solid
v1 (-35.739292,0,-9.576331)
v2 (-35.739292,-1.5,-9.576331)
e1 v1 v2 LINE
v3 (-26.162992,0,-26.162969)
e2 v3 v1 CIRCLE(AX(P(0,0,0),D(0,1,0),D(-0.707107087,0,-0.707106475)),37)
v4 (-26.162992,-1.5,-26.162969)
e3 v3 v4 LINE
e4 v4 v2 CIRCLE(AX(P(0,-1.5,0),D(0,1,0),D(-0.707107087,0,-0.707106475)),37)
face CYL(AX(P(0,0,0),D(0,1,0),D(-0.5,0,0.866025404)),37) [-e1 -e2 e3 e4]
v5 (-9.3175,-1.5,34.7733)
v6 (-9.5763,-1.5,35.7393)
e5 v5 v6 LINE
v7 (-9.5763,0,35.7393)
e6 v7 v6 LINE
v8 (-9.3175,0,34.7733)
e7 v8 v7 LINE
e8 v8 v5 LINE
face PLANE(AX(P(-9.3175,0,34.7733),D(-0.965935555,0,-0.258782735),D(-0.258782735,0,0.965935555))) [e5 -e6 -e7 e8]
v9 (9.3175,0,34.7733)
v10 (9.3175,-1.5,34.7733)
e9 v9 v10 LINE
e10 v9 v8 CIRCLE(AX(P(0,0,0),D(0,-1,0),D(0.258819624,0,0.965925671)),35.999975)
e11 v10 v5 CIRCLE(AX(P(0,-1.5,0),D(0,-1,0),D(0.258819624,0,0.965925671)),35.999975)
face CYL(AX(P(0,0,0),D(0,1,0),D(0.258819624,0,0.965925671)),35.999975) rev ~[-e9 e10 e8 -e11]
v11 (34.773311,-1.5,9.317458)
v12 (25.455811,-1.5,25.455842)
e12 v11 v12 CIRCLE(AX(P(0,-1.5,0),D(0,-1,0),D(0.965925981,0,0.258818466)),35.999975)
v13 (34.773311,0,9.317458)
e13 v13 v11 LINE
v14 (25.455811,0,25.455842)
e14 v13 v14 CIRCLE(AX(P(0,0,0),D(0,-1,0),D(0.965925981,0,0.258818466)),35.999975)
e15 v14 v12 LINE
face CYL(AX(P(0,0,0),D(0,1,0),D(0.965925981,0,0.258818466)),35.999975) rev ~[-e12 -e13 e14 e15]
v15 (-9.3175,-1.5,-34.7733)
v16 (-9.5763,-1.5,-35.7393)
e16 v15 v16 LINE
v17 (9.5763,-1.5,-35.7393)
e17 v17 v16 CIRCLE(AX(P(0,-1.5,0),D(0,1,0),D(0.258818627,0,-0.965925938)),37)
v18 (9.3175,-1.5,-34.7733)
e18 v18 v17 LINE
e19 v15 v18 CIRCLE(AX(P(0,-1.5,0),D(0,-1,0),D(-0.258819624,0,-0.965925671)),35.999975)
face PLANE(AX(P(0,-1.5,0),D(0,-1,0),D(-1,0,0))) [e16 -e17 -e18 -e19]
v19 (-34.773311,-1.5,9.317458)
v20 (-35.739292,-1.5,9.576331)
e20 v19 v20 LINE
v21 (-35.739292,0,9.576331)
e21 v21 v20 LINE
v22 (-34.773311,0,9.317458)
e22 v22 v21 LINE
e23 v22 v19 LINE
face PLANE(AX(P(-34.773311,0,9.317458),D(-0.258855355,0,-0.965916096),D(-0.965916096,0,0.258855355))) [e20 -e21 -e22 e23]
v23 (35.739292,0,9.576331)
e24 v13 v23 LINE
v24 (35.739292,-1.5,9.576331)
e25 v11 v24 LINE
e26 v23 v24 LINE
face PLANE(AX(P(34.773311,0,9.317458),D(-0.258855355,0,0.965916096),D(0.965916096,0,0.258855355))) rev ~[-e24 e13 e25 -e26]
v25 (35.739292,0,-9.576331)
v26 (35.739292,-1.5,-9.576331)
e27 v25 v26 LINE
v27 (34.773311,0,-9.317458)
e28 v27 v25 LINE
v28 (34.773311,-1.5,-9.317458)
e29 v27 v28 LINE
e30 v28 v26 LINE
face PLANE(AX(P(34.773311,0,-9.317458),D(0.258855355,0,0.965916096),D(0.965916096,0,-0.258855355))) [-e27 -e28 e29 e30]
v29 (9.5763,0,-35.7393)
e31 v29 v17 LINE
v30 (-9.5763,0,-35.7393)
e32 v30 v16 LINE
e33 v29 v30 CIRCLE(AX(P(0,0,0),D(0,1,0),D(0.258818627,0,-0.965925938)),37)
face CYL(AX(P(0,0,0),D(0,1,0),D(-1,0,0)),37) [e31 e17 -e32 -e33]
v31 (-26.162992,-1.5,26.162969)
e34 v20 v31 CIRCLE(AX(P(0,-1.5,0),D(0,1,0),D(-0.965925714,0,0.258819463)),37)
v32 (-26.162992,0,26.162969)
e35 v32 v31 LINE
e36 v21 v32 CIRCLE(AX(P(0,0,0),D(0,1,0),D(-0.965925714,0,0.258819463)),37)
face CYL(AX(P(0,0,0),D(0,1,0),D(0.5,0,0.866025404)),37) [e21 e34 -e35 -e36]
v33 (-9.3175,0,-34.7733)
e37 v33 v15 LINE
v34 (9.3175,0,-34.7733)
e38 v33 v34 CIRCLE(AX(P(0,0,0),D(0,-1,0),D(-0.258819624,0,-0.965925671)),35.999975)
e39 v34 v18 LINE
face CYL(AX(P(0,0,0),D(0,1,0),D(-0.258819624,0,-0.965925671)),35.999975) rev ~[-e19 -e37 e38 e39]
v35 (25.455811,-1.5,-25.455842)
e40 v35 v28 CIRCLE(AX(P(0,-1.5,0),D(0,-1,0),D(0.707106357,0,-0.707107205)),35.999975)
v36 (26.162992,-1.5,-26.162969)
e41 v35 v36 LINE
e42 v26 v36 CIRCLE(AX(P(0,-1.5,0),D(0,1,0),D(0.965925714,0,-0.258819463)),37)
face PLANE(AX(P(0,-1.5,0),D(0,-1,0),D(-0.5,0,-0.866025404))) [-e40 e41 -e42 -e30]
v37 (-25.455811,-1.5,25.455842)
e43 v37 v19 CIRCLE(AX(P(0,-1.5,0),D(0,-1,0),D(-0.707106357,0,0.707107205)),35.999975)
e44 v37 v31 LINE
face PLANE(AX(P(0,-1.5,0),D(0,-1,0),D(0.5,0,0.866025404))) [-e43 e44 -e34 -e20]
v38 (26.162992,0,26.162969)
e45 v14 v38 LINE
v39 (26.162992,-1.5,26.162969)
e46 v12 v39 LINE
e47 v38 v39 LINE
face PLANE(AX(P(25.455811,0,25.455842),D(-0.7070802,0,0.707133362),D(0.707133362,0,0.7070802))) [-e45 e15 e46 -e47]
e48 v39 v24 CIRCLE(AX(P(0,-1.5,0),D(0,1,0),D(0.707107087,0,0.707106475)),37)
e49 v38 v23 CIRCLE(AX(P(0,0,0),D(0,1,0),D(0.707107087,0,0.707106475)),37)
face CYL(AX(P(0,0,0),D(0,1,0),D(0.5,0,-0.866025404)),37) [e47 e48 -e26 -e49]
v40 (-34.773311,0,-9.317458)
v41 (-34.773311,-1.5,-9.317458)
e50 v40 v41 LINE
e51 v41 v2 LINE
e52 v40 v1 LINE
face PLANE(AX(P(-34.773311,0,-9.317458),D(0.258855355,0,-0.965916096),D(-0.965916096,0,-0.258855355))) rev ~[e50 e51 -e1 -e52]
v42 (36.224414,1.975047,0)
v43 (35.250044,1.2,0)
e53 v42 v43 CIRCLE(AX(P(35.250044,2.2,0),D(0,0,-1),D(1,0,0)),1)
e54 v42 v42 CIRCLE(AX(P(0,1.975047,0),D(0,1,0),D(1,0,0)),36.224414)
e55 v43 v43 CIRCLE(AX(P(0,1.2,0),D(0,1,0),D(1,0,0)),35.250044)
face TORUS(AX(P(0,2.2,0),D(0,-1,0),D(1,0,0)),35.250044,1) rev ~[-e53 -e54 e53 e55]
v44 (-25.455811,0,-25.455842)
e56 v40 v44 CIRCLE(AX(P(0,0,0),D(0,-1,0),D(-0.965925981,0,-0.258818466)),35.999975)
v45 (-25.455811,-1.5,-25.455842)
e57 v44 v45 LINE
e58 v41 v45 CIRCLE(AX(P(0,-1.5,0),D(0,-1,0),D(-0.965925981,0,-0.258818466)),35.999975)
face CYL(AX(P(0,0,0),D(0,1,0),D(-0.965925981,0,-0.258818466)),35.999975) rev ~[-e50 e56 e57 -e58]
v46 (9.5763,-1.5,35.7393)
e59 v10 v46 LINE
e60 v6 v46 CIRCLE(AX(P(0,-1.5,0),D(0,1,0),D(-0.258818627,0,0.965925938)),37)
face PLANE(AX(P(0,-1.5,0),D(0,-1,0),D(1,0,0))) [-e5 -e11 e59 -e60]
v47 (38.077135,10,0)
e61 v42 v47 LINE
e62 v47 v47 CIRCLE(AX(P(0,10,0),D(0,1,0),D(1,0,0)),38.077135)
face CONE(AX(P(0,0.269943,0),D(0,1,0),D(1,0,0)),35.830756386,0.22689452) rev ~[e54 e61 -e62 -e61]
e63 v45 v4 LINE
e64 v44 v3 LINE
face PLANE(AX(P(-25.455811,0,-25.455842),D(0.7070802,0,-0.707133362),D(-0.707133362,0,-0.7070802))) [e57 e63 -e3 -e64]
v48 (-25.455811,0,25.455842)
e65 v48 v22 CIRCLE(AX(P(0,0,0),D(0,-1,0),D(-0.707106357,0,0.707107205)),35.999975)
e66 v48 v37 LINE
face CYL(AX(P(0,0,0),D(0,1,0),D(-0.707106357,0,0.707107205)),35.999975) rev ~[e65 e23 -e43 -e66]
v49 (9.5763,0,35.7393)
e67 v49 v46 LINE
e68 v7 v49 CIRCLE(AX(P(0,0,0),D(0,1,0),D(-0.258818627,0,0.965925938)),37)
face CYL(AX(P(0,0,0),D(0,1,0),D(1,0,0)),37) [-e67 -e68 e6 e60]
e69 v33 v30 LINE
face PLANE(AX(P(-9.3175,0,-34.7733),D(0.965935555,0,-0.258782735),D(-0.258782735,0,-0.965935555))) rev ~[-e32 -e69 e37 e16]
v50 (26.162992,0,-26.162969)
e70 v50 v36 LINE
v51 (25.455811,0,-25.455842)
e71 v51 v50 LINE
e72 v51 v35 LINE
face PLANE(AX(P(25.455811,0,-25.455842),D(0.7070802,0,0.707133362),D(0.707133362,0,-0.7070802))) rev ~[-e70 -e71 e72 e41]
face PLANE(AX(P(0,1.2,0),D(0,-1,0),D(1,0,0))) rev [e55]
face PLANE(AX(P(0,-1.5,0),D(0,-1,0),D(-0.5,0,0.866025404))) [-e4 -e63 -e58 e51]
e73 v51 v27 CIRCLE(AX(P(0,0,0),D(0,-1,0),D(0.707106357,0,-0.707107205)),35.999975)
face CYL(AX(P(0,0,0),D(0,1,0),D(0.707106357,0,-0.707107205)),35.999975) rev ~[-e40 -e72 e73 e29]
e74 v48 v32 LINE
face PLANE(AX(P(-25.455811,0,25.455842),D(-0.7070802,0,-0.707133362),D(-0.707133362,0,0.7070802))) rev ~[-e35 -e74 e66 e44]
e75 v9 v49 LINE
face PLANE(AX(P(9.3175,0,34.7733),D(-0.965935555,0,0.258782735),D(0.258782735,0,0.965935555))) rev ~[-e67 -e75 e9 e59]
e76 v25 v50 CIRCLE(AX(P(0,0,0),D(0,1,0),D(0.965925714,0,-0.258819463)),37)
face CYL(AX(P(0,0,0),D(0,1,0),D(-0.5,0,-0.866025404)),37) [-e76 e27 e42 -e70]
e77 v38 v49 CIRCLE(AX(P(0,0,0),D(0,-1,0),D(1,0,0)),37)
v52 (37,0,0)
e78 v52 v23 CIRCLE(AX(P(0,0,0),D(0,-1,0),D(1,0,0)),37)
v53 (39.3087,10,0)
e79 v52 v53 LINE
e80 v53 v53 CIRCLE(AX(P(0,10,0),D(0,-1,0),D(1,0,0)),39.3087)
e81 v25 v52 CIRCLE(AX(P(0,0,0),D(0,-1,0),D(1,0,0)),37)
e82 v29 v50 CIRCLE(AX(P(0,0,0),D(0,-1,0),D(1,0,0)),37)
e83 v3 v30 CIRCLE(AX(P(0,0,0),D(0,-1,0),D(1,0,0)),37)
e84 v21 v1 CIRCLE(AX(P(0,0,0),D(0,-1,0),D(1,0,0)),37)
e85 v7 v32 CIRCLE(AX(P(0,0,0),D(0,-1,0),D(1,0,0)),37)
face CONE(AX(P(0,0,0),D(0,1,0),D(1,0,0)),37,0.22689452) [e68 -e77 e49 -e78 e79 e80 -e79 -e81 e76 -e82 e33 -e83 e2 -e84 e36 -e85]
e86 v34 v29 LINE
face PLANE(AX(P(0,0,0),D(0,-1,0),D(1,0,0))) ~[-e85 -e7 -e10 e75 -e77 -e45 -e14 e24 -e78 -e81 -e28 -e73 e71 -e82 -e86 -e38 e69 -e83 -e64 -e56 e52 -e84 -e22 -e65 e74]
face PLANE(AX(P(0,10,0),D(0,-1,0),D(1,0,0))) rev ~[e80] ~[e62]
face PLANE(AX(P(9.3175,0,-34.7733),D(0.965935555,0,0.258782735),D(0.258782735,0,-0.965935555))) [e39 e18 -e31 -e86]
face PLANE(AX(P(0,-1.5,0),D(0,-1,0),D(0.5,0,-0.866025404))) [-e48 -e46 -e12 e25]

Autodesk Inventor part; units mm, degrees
ref_plane "YZ Plane" through (0, 0, 0) normal (1, 0, 0) x (0, 1, 0)
ref_plane "XZ Plane" through (0, 0, 0) normal (0, 1, 0) x (-1, 0, 0)
ref_plane "XY Plane" through (0, 0, 0) normal (0, 0, 1) x (1, 0, 0)
sketch "Sketch1" plane through (0, 0, 0) normal (0, 0, 1) x (1, 0, 0)
  line L0 (0, 0) -> (37, 0)
  line L1 (37, 0) -> (39.3087, 10)
  line L2 (39.3087, 10) -> (0, 10)
  line L3 (0, 10) -> (0, 0)
  dimension "d0" = 77
  dimension "d2" = 37
  dimension "d3" = 10
revolve "Revolution1" add sketch "Sketch1" angle 360 about axis through (0, 10, 0) along (0, -1, 0)
shell "Shell1" thickness 1.2 removed faces 1 at (-11.8053, 10, 5.6851)
fillet "Fillet1" radius 1 1 edges at (-36.0455, 1.2, 0)
sketch "Sketch2" plane through (0, 0, 0) normal (0, -1, 0) x (1, 0, 0)
  circle A0 centre (0, 0) radius 37 projected
  arc A1 (9.3175, 34.7733) -> (-9.3175, 34.7733) centre (0, 0) ccw
  line L0 (-9.3175, 34.7733) -> (-9.5763, 35.7393)
  line L1 (0, 0) -> (0, 37)
  line L2 (9.3175, 34.7733) -> (9.5763, 35.7393)
  arc A2 (9.5763, 35.7393) -> (-9.5763, 35.7393) centre (0, 0) ccw
  point P0 (0, 0)
  dimension "d8" = 72
  dimension "d9" = 15
  dimension "d10" = 15
extrude "Extrusion1" add sketch "Sketch2" along normal blind 1.5 contours L2 A1 L1 A0 | A0 L1 A1 L0
pattern_circular "Circular Pattern1" count 6 over 360 about axis through (0, -10, 0) along (0, 1, 0) of "Extrusion1"
properties part number "pot_holder_prototype"
